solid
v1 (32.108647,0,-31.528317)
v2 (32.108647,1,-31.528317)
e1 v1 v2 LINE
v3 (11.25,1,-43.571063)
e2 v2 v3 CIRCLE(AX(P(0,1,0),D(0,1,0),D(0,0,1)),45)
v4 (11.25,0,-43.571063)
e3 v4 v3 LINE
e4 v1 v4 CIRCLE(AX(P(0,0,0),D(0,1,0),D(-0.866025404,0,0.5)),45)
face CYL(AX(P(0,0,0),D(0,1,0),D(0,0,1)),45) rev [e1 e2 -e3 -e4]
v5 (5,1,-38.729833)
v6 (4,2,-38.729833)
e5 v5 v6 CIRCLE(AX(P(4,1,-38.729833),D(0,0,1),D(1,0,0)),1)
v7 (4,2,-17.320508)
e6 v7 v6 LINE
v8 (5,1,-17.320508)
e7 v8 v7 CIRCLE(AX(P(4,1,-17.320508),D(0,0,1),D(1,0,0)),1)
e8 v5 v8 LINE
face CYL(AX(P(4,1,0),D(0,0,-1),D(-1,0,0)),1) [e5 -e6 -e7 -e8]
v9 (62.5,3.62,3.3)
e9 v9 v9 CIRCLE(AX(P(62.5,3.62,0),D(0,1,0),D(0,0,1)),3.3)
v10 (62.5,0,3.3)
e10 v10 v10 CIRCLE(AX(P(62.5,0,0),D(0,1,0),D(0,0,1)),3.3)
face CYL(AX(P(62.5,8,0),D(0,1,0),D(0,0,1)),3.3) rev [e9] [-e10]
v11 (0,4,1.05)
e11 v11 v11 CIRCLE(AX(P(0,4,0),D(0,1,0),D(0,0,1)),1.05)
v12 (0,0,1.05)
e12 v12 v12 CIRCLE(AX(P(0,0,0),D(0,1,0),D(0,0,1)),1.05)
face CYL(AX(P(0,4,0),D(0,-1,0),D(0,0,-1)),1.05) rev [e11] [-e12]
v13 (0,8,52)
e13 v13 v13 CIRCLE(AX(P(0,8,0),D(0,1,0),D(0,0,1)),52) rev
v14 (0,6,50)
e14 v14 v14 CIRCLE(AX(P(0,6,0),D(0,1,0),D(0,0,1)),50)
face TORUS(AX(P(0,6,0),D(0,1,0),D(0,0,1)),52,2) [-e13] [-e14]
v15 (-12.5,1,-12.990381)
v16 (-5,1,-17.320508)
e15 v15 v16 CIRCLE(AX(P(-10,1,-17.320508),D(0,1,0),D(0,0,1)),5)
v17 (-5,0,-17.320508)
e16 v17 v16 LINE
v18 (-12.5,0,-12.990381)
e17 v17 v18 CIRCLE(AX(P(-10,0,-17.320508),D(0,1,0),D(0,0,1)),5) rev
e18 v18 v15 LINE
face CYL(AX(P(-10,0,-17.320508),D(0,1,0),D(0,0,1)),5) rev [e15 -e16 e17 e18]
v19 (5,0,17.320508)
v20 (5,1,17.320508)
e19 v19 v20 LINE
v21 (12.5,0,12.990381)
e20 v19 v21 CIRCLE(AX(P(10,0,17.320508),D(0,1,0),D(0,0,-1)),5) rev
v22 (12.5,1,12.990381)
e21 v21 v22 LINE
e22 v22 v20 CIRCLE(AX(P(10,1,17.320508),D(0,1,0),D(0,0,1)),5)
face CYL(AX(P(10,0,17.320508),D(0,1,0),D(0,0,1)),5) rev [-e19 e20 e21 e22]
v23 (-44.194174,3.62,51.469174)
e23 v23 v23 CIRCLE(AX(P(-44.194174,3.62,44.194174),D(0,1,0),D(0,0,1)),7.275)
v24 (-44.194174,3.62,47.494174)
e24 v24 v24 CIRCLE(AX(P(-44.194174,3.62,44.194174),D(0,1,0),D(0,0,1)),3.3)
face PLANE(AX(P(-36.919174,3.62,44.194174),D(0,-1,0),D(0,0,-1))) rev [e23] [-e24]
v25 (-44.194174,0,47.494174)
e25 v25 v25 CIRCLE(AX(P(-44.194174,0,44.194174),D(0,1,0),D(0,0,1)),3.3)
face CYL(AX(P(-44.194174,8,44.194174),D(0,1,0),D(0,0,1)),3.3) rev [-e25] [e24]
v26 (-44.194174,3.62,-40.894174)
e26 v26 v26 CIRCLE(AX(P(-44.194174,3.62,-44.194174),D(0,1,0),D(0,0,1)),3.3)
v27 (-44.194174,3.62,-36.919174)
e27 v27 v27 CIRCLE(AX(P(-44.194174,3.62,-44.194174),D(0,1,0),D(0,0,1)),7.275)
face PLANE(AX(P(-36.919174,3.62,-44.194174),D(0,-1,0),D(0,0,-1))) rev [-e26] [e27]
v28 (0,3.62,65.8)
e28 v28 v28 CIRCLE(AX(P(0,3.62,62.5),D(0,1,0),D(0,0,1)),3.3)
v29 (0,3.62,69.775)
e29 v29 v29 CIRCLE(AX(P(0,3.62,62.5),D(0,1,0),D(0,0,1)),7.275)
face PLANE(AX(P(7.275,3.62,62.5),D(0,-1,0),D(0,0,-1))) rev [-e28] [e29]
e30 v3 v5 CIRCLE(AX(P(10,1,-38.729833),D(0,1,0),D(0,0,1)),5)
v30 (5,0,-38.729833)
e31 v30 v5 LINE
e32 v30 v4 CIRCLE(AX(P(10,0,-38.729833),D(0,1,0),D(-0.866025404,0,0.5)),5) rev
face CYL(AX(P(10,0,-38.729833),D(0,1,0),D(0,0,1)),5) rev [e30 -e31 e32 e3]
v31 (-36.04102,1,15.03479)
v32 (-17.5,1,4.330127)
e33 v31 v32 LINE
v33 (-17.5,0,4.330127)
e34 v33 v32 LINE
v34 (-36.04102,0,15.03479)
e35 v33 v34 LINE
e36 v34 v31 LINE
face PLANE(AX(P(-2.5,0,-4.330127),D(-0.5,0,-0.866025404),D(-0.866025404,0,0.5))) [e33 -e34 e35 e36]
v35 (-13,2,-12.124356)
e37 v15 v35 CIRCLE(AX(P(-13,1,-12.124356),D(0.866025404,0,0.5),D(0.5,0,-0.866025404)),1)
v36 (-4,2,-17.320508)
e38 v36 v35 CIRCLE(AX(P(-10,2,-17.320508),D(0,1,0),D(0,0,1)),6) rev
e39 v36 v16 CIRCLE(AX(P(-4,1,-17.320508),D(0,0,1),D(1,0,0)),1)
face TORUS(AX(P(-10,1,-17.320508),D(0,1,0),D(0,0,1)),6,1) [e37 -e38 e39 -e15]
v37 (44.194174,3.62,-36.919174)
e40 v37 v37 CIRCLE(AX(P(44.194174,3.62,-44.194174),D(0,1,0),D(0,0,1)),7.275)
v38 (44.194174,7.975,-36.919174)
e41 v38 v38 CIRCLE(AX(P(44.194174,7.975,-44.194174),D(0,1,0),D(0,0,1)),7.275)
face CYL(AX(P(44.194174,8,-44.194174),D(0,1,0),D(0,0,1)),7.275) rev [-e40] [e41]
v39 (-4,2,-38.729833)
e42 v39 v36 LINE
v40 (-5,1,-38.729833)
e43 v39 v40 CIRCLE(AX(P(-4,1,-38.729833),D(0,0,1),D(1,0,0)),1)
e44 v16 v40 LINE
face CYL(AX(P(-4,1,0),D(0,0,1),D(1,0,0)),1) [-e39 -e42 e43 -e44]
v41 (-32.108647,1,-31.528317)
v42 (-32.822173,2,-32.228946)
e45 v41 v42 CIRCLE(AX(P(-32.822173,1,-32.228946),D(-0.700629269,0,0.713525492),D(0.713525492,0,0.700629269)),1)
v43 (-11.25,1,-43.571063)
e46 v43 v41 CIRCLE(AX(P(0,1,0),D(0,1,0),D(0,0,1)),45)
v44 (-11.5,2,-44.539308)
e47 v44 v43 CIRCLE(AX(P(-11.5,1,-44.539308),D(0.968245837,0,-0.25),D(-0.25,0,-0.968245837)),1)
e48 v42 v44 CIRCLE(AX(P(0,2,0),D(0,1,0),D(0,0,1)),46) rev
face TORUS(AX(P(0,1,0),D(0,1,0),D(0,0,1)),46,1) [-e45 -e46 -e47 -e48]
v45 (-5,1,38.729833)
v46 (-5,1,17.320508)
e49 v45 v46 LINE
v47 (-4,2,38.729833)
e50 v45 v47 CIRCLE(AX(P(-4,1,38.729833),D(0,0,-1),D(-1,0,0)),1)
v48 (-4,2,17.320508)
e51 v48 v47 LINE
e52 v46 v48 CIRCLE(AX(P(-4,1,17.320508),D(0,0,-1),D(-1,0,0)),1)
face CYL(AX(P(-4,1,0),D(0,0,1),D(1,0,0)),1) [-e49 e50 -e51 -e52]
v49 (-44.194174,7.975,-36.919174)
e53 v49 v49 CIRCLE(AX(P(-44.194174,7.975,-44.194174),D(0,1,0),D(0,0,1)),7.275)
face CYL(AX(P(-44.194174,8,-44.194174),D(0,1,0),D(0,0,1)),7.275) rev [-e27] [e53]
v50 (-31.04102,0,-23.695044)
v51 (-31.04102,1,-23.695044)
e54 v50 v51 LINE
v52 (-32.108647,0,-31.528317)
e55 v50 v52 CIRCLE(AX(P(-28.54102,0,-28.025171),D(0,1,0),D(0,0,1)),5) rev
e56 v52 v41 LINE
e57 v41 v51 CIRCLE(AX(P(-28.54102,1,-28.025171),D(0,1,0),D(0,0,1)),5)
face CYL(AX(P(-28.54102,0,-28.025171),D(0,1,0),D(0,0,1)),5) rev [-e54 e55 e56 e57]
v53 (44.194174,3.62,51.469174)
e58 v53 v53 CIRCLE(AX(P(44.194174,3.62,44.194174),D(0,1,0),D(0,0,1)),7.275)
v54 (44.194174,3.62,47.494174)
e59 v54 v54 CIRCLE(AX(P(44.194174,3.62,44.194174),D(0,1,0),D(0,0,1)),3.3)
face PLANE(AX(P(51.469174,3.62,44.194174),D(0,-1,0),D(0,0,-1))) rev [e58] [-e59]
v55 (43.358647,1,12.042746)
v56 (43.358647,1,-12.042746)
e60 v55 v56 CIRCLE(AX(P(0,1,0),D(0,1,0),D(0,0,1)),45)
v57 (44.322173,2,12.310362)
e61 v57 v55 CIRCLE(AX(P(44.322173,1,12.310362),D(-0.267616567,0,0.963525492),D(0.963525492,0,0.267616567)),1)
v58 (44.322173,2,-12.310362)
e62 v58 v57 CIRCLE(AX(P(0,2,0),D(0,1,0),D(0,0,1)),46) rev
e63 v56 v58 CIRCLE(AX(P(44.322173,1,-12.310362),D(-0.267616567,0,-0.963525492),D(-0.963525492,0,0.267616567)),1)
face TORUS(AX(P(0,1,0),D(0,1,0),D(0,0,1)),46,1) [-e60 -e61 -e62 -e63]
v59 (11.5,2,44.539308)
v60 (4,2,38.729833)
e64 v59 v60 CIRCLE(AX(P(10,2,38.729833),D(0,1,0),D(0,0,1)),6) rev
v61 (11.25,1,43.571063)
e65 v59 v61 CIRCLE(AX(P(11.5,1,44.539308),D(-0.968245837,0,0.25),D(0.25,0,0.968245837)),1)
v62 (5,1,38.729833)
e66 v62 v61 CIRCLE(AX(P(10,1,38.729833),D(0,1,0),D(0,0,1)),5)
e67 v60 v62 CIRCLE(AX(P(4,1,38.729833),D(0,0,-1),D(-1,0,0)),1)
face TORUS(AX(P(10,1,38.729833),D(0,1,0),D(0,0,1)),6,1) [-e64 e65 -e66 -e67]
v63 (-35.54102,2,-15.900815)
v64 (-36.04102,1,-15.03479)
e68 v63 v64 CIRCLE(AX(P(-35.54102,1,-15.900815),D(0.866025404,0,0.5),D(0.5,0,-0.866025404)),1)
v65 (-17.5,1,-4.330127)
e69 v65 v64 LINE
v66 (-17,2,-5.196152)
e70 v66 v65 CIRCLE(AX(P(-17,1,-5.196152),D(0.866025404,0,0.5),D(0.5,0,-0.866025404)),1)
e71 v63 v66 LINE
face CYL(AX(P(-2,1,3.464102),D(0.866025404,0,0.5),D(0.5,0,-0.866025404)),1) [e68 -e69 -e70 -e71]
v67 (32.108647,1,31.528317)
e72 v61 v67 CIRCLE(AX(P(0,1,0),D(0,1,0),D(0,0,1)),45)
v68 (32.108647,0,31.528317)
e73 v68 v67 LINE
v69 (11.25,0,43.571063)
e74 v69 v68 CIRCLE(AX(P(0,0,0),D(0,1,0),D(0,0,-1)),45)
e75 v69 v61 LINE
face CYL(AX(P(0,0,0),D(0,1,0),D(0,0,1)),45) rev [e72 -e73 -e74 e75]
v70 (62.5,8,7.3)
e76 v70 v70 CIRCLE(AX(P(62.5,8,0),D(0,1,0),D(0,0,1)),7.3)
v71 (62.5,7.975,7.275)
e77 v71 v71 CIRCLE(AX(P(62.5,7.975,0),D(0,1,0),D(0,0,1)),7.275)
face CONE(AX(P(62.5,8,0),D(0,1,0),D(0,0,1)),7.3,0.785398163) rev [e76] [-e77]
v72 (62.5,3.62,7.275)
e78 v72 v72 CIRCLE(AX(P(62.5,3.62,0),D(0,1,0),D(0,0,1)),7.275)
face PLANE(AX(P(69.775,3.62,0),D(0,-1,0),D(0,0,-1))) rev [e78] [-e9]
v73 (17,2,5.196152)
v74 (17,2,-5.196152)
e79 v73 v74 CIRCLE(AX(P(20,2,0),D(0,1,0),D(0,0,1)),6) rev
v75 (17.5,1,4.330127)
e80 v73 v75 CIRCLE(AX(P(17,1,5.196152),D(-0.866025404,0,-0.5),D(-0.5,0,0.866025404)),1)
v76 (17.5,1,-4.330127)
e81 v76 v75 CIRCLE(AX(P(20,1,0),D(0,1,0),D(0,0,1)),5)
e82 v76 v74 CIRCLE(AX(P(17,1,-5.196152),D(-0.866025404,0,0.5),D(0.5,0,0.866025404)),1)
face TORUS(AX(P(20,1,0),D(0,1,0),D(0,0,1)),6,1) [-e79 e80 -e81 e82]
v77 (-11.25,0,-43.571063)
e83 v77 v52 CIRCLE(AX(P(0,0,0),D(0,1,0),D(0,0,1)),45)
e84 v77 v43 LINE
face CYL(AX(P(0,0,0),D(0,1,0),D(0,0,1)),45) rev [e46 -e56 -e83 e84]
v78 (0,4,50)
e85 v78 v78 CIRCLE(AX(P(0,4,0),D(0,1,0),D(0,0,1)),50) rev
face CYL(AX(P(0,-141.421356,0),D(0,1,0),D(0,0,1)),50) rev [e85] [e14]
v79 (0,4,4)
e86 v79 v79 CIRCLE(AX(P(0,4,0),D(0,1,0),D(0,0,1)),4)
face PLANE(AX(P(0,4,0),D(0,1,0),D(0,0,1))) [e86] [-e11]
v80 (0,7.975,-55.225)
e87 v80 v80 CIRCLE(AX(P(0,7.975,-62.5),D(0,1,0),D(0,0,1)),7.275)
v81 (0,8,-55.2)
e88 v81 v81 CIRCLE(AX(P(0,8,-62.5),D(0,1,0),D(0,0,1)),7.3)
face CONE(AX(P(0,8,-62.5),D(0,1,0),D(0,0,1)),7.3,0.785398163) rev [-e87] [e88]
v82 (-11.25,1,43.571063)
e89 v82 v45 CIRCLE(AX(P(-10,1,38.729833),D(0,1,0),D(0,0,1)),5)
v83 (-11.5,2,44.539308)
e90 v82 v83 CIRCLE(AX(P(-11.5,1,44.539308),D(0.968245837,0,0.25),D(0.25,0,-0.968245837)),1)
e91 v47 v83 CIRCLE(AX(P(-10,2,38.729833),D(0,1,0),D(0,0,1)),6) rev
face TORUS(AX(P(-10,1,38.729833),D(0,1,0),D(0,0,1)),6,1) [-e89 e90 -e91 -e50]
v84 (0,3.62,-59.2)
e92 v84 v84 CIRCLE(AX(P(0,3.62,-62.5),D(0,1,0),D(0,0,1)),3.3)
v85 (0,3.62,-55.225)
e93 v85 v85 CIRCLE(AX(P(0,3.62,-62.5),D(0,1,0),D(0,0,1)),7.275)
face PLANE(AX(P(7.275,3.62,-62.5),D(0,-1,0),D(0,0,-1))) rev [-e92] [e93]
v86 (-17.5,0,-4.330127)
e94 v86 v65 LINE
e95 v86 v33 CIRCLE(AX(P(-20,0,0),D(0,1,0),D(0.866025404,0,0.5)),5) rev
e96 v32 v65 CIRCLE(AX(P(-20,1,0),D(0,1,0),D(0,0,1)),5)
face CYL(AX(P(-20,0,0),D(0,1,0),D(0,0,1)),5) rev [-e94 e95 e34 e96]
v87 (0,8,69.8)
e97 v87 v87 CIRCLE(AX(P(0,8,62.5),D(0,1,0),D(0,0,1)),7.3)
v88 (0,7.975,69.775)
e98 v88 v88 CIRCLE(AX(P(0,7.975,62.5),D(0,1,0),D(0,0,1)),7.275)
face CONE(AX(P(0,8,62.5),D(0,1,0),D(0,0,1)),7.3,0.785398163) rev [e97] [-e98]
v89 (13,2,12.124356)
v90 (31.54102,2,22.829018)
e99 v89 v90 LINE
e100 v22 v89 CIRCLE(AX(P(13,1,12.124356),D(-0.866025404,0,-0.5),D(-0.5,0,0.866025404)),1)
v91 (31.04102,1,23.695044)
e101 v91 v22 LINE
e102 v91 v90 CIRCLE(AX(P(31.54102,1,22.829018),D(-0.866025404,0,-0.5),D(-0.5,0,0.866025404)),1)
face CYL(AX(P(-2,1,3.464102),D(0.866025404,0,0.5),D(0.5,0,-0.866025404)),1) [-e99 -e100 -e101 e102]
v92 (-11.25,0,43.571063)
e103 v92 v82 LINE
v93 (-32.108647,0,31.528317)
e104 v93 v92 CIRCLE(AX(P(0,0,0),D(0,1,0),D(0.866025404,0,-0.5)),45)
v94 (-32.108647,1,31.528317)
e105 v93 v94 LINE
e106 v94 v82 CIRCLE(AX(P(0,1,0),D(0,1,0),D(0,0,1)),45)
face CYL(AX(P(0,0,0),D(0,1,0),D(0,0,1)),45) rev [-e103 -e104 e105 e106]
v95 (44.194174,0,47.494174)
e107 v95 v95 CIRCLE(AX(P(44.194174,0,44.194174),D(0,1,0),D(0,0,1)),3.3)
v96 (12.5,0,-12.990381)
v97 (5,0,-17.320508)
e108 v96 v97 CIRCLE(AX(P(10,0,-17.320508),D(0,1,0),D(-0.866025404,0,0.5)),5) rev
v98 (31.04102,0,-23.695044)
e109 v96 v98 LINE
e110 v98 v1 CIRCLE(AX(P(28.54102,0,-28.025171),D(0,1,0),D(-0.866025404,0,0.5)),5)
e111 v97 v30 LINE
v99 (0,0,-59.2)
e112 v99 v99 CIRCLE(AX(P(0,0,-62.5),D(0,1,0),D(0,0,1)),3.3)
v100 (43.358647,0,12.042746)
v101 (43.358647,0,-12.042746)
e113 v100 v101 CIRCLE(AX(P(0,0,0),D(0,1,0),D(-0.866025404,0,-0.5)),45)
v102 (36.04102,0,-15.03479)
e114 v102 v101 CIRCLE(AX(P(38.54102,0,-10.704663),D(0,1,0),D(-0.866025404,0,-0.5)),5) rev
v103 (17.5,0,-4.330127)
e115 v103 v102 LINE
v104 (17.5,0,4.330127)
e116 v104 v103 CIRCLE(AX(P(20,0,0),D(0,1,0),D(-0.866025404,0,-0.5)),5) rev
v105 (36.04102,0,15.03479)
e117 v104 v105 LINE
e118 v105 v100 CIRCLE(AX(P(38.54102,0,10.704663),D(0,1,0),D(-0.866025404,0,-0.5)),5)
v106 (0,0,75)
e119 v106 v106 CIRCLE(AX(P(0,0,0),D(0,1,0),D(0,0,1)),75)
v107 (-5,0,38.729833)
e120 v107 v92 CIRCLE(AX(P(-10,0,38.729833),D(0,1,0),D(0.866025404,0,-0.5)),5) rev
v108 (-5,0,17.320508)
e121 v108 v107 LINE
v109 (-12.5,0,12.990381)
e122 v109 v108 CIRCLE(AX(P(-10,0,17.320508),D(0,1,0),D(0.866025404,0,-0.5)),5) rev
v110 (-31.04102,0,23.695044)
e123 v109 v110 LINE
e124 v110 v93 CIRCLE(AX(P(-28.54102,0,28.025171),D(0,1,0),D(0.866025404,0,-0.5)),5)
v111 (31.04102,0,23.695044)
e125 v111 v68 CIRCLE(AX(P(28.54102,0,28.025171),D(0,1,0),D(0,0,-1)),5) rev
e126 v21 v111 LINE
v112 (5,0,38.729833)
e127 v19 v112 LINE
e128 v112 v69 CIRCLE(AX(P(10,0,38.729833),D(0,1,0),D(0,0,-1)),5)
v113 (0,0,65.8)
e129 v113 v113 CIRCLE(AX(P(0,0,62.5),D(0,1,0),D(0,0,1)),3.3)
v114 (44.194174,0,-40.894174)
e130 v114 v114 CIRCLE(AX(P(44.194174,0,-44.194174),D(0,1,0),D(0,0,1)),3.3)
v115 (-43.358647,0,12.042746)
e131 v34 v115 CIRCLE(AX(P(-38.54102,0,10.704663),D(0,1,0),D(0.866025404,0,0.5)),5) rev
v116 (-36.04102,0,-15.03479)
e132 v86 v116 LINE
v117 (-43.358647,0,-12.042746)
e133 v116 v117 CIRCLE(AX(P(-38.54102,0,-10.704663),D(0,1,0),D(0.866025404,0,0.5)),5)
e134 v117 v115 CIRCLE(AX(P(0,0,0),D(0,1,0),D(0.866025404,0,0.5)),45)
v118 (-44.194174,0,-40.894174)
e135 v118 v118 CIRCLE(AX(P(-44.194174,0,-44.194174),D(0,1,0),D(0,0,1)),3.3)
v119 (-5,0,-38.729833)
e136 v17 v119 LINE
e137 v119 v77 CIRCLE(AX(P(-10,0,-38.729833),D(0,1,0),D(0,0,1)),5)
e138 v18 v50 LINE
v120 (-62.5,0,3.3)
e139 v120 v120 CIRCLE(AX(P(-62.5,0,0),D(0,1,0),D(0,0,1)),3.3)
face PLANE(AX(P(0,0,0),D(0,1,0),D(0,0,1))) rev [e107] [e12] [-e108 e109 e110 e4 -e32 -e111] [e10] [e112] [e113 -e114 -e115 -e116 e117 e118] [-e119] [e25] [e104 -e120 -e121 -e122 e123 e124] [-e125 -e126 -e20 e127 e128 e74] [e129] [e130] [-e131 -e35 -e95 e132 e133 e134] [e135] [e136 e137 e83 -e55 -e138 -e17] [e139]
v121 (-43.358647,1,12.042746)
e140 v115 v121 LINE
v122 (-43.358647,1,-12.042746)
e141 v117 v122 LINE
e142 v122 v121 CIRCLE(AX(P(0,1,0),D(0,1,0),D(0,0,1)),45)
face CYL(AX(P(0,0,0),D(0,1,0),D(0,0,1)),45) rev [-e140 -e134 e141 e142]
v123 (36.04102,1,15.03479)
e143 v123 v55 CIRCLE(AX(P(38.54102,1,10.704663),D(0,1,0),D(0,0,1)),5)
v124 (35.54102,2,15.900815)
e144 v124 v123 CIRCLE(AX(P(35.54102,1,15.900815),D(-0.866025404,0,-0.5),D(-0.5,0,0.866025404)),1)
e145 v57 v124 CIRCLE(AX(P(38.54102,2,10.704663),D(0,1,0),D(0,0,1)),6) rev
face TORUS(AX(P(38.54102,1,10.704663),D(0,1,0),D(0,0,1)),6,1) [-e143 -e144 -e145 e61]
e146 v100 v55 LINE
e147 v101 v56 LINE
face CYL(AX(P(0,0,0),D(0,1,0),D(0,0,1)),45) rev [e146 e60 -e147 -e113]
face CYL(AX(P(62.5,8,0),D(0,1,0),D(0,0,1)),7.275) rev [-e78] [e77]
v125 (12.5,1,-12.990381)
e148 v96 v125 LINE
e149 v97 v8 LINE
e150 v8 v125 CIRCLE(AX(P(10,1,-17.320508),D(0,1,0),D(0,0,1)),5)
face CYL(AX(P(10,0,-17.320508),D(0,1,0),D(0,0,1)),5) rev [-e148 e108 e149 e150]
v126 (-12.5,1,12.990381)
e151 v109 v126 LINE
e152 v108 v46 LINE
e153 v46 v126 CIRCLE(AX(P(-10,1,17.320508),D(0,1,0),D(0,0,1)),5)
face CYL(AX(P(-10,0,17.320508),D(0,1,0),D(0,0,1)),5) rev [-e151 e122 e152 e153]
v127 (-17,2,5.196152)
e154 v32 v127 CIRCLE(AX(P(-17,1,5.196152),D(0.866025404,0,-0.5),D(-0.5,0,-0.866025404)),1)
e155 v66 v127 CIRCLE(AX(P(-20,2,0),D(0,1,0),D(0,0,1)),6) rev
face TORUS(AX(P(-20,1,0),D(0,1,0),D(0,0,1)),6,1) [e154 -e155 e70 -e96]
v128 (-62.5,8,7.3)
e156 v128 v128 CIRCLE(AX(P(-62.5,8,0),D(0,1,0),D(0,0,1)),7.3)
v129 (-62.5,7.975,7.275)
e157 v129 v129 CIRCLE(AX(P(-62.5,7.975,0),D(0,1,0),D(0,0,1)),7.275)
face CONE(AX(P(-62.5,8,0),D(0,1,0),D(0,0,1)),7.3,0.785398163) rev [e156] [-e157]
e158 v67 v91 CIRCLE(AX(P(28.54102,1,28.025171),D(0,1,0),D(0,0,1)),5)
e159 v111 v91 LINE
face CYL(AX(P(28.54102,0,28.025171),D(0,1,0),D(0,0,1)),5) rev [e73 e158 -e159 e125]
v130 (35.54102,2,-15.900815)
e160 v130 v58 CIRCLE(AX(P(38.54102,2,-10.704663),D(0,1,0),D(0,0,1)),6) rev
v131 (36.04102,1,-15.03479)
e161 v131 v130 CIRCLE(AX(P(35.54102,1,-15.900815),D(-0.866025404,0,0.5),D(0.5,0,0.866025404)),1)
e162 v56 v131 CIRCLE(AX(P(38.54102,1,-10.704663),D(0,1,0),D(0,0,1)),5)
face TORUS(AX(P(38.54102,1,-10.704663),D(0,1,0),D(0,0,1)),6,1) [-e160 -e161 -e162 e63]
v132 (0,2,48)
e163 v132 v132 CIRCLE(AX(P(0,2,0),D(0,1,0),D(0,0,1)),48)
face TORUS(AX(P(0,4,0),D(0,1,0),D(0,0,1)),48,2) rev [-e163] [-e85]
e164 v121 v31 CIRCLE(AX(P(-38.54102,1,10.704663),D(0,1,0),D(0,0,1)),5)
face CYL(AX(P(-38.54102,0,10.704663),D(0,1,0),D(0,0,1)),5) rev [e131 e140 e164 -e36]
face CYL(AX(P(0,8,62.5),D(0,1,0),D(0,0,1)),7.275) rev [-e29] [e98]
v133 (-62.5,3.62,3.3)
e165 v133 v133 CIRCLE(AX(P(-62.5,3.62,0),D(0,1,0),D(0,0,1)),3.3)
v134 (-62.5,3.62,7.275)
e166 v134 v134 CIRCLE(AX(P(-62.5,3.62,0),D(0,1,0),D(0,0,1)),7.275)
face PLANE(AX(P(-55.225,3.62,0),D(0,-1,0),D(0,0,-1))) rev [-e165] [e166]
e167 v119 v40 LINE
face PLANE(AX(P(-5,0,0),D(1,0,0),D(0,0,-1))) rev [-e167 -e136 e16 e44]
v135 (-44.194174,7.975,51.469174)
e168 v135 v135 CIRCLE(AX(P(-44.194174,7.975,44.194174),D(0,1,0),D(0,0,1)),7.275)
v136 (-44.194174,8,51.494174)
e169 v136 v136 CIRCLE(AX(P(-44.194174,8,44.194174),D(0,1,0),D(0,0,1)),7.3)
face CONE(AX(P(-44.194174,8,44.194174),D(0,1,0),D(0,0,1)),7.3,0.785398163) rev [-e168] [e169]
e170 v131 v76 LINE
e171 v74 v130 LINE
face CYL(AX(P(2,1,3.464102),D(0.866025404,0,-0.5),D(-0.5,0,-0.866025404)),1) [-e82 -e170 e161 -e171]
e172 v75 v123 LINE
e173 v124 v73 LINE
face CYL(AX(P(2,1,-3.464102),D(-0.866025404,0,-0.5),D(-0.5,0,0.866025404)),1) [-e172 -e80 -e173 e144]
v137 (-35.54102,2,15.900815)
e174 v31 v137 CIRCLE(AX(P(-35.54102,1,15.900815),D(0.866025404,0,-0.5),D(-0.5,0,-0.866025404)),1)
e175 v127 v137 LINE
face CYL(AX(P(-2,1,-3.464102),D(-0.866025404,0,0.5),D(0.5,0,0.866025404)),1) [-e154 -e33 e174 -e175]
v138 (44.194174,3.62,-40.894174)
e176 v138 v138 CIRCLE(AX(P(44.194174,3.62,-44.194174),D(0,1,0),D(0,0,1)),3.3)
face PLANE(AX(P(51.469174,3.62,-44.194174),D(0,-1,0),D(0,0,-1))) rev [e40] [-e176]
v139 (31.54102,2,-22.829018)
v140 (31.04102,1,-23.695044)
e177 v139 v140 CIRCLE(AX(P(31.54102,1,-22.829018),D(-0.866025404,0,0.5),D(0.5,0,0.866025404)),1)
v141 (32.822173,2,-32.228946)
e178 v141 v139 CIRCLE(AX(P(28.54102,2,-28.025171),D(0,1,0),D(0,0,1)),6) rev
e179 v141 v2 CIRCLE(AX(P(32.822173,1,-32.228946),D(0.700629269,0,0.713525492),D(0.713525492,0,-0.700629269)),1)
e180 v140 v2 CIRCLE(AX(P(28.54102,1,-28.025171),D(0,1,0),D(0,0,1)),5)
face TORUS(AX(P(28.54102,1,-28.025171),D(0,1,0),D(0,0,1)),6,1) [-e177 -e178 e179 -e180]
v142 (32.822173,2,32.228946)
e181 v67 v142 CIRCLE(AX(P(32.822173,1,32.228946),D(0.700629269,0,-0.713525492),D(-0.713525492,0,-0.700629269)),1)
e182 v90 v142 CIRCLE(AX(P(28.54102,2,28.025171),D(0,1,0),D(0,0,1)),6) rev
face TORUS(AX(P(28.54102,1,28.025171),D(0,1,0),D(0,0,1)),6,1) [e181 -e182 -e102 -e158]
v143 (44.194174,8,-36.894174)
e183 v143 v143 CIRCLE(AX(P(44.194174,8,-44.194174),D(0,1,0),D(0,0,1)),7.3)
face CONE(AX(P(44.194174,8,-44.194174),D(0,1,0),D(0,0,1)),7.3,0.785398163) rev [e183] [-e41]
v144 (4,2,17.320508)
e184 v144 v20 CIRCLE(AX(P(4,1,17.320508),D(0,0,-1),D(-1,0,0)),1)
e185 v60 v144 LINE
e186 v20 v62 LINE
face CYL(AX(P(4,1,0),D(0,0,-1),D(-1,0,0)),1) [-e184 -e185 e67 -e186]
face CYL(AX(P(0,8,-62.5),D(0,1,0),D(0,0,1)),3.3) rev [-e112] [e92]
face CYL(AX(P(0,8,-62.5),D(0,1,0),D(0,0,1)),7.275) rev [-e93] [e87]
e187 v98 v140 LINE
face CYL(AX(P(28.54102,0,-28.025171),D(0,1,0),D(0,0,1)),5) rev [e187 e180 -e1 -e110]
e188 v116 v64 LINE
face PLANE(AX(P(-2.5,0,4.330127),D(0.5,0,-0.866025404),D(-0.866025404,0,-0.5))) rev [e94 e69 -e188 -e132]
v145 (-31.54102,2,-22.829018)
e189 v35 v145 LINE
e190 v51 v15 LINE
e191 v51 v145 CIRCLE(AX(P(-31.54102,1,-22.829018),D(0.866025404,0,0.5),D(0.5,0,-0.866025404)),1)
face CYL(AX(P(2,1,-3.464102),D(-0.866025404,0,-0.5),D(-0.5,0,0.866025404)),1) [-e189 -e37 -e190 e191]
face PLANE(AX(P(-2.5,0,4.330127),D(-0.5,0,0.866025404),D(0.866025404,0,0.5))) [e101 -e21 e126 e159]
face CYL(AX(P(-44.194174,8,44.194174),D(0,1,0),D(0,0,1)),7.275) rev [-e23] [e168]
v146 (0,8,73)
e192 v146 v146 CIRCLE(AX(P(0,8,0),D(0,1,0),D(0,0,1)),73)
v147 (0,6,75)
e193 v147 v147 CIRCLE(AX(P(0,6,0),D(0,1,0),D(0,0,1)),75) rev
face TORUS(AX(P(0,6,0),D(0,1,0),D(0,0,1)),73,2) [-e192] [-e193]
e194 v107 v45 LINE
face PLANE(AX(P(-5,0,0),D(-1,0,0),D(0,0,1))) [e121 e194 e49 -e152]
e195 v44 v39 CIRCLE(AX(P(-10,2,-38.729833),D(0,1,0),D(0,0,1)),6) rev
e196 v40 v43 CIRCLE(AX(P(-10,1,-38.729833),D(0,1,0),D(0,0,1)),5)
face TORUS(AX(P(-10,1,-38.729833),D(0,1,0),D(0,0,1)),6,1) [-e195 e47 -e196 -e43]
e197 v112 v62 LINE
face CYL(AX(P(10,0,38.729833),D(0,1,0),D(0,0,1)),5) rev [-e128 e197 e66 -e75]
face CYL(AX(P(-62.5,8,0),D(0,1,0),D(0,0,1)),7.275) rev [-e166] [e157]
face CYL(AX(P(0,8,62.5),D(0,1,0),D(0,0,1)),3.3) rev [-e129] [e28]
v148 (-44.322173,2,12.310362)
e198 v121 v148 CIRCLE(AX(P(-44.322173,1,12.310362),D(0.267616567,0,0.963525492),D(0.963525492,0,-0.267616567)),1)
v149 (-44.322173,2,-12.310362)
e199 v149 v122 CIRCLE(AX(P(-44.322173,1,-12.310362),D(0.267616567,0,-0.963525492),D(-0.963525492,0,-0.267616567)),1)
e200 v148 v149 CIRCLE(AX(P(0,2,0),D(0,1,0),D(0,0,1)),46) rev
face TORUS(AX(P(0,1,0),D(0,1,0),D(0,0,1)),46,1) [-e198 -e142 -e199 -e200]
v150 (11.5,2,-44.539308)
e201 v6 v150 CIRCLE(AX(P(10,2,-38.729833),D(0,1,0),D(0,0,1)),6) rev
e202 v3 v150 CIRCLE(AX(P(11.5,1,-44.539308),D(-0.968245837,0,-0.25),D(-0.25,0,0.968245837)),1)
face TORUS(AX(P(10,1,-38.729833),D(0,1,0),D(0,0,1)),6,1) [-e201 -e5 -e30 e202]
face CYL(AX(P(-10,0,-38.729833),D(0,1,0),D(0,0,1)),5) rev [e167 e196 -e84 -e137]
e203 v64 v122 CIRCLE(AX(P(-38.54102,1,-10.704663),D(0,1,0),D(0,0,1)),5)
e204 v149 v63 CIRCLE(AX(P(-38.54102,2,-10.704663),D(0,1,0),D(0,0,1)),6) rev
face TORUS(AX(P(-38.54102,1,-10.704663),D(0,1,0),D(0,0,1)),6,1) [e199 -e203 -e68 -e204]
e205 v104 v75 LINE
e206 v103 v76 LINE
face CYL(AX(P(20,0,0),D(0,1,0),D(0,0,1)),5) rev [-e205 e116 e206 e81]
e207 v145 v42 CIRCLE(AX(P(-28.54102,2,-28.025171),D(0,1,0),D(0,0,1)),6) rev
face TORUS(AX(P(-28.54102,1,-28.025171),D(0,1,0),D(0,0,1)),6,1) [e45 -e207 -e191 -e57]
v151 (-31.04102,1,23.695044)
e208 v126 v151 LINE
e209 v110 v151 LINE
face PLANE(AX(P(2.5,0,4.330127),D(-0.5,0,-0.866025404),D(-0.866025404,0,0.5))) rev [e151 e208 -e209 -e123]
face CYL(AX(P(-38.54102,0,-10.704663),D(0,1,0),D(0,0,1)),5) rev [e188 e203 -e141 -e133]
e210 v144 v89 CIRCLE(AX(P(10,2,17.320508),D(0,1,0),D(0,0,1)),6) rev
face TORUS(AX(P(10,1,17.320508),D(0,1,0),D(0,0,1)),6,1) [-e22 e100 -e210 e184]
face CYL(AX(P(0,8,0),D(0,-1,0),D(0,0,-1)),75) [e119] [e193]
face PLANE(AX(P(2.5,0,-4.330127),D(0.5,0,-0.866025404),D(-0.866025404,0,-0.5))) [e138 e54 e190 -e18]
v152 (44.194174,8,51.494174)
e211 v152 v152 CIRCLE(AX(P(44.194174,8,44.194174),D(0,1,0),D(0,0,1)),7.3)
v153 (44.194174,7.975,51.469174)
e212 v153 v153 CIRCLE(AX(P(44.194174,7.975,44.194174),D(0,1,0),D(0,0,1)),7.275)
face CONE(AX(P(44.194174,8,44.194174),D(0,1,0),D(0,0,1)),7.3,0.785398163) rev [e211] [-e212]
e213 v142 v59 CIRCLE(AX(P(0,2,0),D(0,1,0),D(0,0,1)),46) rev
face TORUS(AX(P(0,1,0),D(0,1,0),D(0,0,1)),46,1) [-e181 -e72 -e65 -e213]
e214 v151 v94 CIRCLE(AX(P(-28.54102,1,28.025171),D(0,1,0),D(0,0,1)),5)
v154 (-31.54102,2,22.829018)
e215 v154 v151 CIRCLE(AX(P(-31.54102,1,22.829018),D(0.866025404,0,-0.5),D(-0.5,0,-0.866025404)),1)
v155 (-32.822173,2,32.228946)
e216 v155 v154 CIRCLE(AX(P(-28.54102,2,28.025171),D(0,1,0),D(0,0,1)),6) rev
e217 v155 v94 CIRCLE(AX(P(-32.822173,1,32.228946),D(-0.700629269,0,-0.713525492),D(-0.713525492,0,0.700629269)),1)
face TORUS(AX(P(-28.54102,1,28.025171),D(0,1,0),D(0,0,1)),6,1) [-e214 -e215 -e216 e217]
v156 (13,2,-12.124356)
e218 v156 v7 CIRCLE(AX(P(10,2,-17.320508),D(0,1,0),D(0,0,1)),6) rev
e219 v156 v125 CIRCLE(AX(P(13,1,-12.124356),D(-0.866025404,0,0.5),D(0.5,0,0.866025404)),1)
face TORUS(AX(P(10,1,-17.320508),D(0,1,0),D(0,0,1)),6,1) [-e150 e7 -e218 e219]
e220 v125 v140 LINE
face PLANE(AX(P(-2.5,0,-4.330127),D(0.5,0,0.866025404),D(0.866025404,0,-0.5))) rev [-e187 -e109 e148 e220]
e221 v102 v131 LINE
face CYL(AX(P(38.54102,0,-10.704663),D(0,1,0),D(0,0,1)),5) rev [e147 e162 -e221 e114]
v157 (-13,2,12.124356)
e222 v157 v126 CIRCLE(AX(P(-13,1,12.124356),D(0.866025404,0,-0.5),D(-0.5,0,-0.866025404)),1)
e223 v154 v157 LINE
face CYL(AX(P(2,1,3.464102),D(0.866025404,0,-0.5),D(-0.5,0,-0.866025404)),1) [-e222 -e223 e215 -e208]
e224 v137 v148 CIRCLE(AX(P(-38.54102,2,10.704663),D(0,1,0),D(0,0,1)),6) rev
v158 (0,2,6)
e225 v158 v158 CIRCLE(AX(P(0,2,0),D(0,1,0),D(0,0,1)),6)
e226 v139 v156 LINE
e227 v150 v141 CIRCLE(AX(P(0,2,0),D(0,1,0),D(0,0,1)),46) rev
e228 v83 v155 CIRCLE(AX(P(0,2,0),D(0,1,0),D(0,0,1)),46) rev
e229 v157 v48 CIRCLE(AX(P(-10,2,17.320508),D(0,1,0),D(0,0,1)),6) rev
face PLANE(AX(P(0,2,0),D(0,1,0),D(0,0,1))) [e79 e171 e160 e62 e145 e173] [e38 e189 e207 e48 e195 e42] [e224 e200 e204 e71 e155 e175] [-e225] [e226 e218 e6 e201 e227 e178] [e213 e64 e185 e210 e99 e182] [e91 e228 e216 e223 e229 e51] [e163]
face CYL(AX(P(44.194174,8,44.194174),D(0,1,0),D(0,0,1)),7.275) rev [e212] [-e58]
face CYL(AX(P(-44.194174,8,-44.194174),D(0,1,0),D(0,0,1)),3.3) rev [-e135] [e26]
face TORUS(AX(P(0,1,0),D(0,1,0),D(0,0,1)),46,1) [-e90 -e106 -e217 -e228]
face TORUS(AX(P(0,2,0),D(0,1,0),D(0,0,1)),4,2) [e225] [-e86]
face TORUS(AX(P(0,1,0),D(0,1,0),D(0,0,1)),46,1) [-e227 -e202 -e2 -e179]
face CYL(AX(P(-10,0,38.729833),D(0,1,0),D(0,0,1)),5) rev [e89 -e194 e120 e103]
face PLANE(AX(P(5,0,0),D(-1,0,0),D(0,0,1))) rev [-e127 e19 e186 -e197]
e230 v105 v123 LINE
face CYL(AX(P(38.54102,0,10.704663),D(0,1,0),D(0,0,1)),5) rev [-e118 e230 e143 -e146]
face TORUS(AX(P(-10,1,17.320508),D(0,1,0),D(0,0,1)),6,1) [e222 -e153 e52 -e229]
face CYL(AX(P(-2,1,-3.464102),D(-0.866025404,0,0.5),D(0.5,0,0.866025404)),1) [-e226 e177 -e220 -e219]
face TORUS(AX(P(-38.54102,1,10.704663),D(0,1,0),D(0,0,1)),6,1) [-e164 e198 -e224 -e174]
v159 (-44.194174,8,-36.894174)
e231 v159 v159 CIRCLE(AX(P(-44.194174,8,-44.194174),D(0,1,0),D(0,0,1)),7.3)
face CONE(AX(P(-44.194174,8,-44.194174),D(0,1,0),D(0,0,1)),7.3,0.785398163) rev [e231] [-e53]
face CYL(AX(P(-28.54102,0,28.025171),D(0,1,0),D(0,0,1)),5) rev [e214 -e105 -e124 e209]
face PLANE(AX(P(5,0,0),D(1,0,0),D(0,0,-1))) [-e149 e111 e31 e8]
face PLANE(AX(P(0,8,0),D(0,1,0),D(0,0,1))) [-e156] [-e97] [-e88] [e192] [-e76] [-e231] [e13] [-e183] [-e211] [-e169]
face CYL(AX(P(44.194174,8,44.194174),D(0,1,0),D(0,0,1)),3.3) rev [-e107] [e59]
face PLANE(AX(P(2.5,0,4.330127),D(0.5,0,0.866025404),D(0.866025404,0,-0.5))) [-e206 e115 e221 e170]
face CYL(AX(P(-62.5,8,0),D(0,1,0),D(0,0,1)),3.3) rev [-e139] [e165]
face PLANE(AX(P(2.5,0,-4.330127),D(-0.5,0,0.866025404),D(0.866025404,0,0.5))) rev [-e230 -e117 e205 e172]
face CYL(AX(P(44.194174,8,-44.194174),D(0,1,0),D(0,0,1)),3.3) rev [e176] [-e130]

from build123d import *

# Parameters (mm, degrees)
SKETCH1_R                = 75
BOSS_EXTRUDE1_DEPTH      = 8
SKETCH2_R                = 50
CUT_EXTRUDE1_DEPTH       = 6
CUT_EXTRUDE2_DEPTH       = 107.235587258
FILLET2_R                = 1
CIRPATTERN1_COUNT        = 6
FILLET2_OF_CIRPATTERN1_R = 1
SKETCH4_R                = 6
SKETCH4_R_2              = 1.05
BOSS_EXTRUDE2_DEPTH      = 2
CUT_EXTRUDE3_DEPTH       = 107.141415103
CUT_EXTRUDE3_DEPTH_BACK  = 107.141415103
SKETCH5_R                = 1.05
FILLET1_R                = 2
FILLET3_R                = 2
CIRPATTERN2_COUNT        = 8


with BuildPart() as part:
    # Sketch1 → Boss-Extrude1 (new body)
    with BuildSketch(Plane(origin=(0, 0, 0), x_dir=(1, 0, 0), z_dir=(0, 1, 0))):
        with Locations(Location((0, 0, 0), (0, 0, 270))):
            Circle(SKETCH1_R)
    extrude(amount=BOSS_EXTRUDE1_DEPTH)

    # Sketch2 → Cut-Extrude1 (cut)
    with BuildSketch(Plane(origin=(0, 8, 0), x_dir=(1, 0, 0), z_dir=(0, 1, 0))):
        with Locations(Location((0, 0, 0), (0, 0, 270))):
            Circle(SKETCH2_R)
    extrude(amount=-CUT_EXTRUDE1_DEPTH, mode=Mode.SUBTRACT)

    # Sketch3 → Cut-Extrude2 (cut, through all)
    with BuildSketch(Plane(origin=(0, 2, 0), x_dir=(1, 0, 0), z_dir=(0, 1, 0))):
        with BuildLine():
            ThreePointArc((-5, 17.320508076), (-7.5, 12.990381057), (-12.5, 12.990381057))
            Line((-12.5, 12.990381057), (-31.041019662, 23.69504375))
            ThreePointArc((-31.041019662, 23.69504375), (-33.495216736, 27.349943877), (-32.10864712, 31.528317115))
            ThreePointArc((-32.10864712, 31.528317115), (-22.5, 38.97114317), (-11.25, 43.571062645))
            ThreePointArc((-11.25, 43.571062645), (-6.938137822, 42.682680537), (-5, 38.729833462))
            Line((-5, 38.729833462), (-5, 17.320508076))
        make_face()
    cut_extrude2 = extrude(amount=-CUT_EXTRUDE2_DEPTH, mode=Mode.SUBTRACT)

    # Fillet2
    fillet2_edges = [part.edges().sort_by_distance(p)[0] for p in [
        (-7.5, 2, -12.990381057),
        (-21.770509831, 2, -18.342712403),
        (-33.495216736, 2, -27.349943877),
        (-5, 2, -28.025170769),
        (-6.938137822, 2, -42.682680537),
        (-22.5, 2, -38.97114317),
    ]]
    fillet(fillet2_edges, radius=FILLET2_R)

    # CirPattern1: Cut-Extrude2 ×6 about axis
    cirpattern1_axis = Axis((0, 0, 0), (0, 1, 0))
    for i in range(1, CIRPATTERN1_COUNT):
        add(cut_extrude2.rotate(cirpattern1_axis, i * 360 / CIRPATTERN1_COUNT), mode=Mode.SUBTRACT)

    # Fillet2 of CirPattern1
    fillet2_of_cirpattern1_edges = [part.edges().sort_by_distance(p)[0] for p in [
        (-15, 2, 0),
        (-26.770509831, 2, 9.682458366),
        (-40.433354558, 2, 15.33273666),
        (-26.770509831, 2, -9.682458366),
        (-40.433354558, 2, -15.33273666),
        (-45, 2, 0),
        (-7.5, 2, 12.990381057),
        (-5, 2, 28.025170769),
        (-6.938137822, 2, 42.682680537),
        (-21.770509831, 2, 18.342712403),
        (-33.495216736, 2, 27.349943877),
        (-22.5, 2, 38.97114317),
        (7.5, 2, 12.990381057),
        (21.770509831, 2, 18.342712403),
        (33.495216736, 2, 27.349943877),
        (5, 2, 28.025170769),
        (6.938137822, 2, 42.682680537),
        (22.5, 2, 38.97114317),
        (15, 2, 0),
        (26.770509831, 2, -9.682458366),
        (40.433354558, 2, -15.33273666),
        (26.770509831, 2, 9.682458366),
        (40.433354558, 2, 15.33273666),
        (45, 2, 0),
        (7.5, 2, -12.990381057),
        (5, 2, -28.025170769),
        (6.938137822, 2, -42.682680537),
        (21.770509831, 2, -18.342712403),
        (33.495216736, 2, -27.349943877),
        (22.5, 2, -38.97114317),
    ]]
    fillet(fillet2_of_cirpattern1_edges, radius=FILLET2_OF_CIRPATTERN1_R)

    # Sketch4 → Boss-Extrude2 (add)
    with BuildSketch(Plane(origin=(0, 2, 0), x_dir=(1, 0, 0), z_dir=(0, 1, 0))):
        with Locations(Location((0, 0, 0), (0, 0, 270))):
            Circle(SKETCH4_R)
        with Locations(Location((0, 0, 0), (0, 0, 270))):
            Circle(SKETCH4_R_2, mode=Mode.SUBTRACT)
    extrude(amount=BOSS_EXTRUDE2_DEPTH)

    # Sketch5 → Cut-Extrude3 (cut, two sides: drawn at the far end of the back side and taken through both)
    with BuildSketch(Plane(origin=(0, 4, 0), x_dir=(1, 0, 0), z_dir=(0, 1, 0)).offset(-CUT_EXTRUDE3_DEPTH_BACK)):
        with Locations(Location((0, 0, 0), (0, 0, 270))):
            Circle(SKETCH5_R)
    extrude(amount=CUT_EXTRUDE3_DEPTH + CUT_EXTRUDE3_DEPTH_BACK, mode=Mode.SUBTRACT)

    # Fillet1
    fillet1_edges = [part.edges().sort_by_distance(p)[0] for p in [
        (0, 4, -6),
        (0, 8, -75),
        (0, 8, -50),
    ]]
    fillet(fillet1_edges, radius=FILLET1_R - 0.0001)  # a hair under: the kernel refuses the full size

    # Fillet3
    fillet3_edges = [part.edges().sort_by_distance(p)[0] for p in [
        (0, 2, -50),
    ]]
    fillet(fillet3_edges, radius=FILLET3_R)

    # Sketch20 → CBORE for M6 Hex Head Bolt2 (revolve, cut)
    with BuildSketch(Plane(origin=(0, 8, -62.5), x_dir=(0, 0, 1), z_dir=(1, 0, 0))):
        Polygon((0, 0), (0, 8), (3.3, 8), (3.3, 4.38), (7.275, 4.38), (7.275, 0.025), (7.3, 0), align=None)
    cbore_for_m6_hex_head_bolt2 = revolve(axis=Axis((0, 14.35, -62.5), (0, -1, 0)), mode=Mode.SUBTRACT)

    # CirPattern2: CBORE for M6 Hex Head Bolt2 ×8 about axis
    cirpattern2_axis = Axis((0, 0, 0), (0, 1, 0))
    for i in range(1, CIRPATTERN2_COUNT):
        add(cbore_for_m6_hex_head_bolt2.rotate(cirpattern2_axis, i * 360 / CIRPATTERN2_COUNT), mode=Mode.SUBTRACT)


solid = part.part
